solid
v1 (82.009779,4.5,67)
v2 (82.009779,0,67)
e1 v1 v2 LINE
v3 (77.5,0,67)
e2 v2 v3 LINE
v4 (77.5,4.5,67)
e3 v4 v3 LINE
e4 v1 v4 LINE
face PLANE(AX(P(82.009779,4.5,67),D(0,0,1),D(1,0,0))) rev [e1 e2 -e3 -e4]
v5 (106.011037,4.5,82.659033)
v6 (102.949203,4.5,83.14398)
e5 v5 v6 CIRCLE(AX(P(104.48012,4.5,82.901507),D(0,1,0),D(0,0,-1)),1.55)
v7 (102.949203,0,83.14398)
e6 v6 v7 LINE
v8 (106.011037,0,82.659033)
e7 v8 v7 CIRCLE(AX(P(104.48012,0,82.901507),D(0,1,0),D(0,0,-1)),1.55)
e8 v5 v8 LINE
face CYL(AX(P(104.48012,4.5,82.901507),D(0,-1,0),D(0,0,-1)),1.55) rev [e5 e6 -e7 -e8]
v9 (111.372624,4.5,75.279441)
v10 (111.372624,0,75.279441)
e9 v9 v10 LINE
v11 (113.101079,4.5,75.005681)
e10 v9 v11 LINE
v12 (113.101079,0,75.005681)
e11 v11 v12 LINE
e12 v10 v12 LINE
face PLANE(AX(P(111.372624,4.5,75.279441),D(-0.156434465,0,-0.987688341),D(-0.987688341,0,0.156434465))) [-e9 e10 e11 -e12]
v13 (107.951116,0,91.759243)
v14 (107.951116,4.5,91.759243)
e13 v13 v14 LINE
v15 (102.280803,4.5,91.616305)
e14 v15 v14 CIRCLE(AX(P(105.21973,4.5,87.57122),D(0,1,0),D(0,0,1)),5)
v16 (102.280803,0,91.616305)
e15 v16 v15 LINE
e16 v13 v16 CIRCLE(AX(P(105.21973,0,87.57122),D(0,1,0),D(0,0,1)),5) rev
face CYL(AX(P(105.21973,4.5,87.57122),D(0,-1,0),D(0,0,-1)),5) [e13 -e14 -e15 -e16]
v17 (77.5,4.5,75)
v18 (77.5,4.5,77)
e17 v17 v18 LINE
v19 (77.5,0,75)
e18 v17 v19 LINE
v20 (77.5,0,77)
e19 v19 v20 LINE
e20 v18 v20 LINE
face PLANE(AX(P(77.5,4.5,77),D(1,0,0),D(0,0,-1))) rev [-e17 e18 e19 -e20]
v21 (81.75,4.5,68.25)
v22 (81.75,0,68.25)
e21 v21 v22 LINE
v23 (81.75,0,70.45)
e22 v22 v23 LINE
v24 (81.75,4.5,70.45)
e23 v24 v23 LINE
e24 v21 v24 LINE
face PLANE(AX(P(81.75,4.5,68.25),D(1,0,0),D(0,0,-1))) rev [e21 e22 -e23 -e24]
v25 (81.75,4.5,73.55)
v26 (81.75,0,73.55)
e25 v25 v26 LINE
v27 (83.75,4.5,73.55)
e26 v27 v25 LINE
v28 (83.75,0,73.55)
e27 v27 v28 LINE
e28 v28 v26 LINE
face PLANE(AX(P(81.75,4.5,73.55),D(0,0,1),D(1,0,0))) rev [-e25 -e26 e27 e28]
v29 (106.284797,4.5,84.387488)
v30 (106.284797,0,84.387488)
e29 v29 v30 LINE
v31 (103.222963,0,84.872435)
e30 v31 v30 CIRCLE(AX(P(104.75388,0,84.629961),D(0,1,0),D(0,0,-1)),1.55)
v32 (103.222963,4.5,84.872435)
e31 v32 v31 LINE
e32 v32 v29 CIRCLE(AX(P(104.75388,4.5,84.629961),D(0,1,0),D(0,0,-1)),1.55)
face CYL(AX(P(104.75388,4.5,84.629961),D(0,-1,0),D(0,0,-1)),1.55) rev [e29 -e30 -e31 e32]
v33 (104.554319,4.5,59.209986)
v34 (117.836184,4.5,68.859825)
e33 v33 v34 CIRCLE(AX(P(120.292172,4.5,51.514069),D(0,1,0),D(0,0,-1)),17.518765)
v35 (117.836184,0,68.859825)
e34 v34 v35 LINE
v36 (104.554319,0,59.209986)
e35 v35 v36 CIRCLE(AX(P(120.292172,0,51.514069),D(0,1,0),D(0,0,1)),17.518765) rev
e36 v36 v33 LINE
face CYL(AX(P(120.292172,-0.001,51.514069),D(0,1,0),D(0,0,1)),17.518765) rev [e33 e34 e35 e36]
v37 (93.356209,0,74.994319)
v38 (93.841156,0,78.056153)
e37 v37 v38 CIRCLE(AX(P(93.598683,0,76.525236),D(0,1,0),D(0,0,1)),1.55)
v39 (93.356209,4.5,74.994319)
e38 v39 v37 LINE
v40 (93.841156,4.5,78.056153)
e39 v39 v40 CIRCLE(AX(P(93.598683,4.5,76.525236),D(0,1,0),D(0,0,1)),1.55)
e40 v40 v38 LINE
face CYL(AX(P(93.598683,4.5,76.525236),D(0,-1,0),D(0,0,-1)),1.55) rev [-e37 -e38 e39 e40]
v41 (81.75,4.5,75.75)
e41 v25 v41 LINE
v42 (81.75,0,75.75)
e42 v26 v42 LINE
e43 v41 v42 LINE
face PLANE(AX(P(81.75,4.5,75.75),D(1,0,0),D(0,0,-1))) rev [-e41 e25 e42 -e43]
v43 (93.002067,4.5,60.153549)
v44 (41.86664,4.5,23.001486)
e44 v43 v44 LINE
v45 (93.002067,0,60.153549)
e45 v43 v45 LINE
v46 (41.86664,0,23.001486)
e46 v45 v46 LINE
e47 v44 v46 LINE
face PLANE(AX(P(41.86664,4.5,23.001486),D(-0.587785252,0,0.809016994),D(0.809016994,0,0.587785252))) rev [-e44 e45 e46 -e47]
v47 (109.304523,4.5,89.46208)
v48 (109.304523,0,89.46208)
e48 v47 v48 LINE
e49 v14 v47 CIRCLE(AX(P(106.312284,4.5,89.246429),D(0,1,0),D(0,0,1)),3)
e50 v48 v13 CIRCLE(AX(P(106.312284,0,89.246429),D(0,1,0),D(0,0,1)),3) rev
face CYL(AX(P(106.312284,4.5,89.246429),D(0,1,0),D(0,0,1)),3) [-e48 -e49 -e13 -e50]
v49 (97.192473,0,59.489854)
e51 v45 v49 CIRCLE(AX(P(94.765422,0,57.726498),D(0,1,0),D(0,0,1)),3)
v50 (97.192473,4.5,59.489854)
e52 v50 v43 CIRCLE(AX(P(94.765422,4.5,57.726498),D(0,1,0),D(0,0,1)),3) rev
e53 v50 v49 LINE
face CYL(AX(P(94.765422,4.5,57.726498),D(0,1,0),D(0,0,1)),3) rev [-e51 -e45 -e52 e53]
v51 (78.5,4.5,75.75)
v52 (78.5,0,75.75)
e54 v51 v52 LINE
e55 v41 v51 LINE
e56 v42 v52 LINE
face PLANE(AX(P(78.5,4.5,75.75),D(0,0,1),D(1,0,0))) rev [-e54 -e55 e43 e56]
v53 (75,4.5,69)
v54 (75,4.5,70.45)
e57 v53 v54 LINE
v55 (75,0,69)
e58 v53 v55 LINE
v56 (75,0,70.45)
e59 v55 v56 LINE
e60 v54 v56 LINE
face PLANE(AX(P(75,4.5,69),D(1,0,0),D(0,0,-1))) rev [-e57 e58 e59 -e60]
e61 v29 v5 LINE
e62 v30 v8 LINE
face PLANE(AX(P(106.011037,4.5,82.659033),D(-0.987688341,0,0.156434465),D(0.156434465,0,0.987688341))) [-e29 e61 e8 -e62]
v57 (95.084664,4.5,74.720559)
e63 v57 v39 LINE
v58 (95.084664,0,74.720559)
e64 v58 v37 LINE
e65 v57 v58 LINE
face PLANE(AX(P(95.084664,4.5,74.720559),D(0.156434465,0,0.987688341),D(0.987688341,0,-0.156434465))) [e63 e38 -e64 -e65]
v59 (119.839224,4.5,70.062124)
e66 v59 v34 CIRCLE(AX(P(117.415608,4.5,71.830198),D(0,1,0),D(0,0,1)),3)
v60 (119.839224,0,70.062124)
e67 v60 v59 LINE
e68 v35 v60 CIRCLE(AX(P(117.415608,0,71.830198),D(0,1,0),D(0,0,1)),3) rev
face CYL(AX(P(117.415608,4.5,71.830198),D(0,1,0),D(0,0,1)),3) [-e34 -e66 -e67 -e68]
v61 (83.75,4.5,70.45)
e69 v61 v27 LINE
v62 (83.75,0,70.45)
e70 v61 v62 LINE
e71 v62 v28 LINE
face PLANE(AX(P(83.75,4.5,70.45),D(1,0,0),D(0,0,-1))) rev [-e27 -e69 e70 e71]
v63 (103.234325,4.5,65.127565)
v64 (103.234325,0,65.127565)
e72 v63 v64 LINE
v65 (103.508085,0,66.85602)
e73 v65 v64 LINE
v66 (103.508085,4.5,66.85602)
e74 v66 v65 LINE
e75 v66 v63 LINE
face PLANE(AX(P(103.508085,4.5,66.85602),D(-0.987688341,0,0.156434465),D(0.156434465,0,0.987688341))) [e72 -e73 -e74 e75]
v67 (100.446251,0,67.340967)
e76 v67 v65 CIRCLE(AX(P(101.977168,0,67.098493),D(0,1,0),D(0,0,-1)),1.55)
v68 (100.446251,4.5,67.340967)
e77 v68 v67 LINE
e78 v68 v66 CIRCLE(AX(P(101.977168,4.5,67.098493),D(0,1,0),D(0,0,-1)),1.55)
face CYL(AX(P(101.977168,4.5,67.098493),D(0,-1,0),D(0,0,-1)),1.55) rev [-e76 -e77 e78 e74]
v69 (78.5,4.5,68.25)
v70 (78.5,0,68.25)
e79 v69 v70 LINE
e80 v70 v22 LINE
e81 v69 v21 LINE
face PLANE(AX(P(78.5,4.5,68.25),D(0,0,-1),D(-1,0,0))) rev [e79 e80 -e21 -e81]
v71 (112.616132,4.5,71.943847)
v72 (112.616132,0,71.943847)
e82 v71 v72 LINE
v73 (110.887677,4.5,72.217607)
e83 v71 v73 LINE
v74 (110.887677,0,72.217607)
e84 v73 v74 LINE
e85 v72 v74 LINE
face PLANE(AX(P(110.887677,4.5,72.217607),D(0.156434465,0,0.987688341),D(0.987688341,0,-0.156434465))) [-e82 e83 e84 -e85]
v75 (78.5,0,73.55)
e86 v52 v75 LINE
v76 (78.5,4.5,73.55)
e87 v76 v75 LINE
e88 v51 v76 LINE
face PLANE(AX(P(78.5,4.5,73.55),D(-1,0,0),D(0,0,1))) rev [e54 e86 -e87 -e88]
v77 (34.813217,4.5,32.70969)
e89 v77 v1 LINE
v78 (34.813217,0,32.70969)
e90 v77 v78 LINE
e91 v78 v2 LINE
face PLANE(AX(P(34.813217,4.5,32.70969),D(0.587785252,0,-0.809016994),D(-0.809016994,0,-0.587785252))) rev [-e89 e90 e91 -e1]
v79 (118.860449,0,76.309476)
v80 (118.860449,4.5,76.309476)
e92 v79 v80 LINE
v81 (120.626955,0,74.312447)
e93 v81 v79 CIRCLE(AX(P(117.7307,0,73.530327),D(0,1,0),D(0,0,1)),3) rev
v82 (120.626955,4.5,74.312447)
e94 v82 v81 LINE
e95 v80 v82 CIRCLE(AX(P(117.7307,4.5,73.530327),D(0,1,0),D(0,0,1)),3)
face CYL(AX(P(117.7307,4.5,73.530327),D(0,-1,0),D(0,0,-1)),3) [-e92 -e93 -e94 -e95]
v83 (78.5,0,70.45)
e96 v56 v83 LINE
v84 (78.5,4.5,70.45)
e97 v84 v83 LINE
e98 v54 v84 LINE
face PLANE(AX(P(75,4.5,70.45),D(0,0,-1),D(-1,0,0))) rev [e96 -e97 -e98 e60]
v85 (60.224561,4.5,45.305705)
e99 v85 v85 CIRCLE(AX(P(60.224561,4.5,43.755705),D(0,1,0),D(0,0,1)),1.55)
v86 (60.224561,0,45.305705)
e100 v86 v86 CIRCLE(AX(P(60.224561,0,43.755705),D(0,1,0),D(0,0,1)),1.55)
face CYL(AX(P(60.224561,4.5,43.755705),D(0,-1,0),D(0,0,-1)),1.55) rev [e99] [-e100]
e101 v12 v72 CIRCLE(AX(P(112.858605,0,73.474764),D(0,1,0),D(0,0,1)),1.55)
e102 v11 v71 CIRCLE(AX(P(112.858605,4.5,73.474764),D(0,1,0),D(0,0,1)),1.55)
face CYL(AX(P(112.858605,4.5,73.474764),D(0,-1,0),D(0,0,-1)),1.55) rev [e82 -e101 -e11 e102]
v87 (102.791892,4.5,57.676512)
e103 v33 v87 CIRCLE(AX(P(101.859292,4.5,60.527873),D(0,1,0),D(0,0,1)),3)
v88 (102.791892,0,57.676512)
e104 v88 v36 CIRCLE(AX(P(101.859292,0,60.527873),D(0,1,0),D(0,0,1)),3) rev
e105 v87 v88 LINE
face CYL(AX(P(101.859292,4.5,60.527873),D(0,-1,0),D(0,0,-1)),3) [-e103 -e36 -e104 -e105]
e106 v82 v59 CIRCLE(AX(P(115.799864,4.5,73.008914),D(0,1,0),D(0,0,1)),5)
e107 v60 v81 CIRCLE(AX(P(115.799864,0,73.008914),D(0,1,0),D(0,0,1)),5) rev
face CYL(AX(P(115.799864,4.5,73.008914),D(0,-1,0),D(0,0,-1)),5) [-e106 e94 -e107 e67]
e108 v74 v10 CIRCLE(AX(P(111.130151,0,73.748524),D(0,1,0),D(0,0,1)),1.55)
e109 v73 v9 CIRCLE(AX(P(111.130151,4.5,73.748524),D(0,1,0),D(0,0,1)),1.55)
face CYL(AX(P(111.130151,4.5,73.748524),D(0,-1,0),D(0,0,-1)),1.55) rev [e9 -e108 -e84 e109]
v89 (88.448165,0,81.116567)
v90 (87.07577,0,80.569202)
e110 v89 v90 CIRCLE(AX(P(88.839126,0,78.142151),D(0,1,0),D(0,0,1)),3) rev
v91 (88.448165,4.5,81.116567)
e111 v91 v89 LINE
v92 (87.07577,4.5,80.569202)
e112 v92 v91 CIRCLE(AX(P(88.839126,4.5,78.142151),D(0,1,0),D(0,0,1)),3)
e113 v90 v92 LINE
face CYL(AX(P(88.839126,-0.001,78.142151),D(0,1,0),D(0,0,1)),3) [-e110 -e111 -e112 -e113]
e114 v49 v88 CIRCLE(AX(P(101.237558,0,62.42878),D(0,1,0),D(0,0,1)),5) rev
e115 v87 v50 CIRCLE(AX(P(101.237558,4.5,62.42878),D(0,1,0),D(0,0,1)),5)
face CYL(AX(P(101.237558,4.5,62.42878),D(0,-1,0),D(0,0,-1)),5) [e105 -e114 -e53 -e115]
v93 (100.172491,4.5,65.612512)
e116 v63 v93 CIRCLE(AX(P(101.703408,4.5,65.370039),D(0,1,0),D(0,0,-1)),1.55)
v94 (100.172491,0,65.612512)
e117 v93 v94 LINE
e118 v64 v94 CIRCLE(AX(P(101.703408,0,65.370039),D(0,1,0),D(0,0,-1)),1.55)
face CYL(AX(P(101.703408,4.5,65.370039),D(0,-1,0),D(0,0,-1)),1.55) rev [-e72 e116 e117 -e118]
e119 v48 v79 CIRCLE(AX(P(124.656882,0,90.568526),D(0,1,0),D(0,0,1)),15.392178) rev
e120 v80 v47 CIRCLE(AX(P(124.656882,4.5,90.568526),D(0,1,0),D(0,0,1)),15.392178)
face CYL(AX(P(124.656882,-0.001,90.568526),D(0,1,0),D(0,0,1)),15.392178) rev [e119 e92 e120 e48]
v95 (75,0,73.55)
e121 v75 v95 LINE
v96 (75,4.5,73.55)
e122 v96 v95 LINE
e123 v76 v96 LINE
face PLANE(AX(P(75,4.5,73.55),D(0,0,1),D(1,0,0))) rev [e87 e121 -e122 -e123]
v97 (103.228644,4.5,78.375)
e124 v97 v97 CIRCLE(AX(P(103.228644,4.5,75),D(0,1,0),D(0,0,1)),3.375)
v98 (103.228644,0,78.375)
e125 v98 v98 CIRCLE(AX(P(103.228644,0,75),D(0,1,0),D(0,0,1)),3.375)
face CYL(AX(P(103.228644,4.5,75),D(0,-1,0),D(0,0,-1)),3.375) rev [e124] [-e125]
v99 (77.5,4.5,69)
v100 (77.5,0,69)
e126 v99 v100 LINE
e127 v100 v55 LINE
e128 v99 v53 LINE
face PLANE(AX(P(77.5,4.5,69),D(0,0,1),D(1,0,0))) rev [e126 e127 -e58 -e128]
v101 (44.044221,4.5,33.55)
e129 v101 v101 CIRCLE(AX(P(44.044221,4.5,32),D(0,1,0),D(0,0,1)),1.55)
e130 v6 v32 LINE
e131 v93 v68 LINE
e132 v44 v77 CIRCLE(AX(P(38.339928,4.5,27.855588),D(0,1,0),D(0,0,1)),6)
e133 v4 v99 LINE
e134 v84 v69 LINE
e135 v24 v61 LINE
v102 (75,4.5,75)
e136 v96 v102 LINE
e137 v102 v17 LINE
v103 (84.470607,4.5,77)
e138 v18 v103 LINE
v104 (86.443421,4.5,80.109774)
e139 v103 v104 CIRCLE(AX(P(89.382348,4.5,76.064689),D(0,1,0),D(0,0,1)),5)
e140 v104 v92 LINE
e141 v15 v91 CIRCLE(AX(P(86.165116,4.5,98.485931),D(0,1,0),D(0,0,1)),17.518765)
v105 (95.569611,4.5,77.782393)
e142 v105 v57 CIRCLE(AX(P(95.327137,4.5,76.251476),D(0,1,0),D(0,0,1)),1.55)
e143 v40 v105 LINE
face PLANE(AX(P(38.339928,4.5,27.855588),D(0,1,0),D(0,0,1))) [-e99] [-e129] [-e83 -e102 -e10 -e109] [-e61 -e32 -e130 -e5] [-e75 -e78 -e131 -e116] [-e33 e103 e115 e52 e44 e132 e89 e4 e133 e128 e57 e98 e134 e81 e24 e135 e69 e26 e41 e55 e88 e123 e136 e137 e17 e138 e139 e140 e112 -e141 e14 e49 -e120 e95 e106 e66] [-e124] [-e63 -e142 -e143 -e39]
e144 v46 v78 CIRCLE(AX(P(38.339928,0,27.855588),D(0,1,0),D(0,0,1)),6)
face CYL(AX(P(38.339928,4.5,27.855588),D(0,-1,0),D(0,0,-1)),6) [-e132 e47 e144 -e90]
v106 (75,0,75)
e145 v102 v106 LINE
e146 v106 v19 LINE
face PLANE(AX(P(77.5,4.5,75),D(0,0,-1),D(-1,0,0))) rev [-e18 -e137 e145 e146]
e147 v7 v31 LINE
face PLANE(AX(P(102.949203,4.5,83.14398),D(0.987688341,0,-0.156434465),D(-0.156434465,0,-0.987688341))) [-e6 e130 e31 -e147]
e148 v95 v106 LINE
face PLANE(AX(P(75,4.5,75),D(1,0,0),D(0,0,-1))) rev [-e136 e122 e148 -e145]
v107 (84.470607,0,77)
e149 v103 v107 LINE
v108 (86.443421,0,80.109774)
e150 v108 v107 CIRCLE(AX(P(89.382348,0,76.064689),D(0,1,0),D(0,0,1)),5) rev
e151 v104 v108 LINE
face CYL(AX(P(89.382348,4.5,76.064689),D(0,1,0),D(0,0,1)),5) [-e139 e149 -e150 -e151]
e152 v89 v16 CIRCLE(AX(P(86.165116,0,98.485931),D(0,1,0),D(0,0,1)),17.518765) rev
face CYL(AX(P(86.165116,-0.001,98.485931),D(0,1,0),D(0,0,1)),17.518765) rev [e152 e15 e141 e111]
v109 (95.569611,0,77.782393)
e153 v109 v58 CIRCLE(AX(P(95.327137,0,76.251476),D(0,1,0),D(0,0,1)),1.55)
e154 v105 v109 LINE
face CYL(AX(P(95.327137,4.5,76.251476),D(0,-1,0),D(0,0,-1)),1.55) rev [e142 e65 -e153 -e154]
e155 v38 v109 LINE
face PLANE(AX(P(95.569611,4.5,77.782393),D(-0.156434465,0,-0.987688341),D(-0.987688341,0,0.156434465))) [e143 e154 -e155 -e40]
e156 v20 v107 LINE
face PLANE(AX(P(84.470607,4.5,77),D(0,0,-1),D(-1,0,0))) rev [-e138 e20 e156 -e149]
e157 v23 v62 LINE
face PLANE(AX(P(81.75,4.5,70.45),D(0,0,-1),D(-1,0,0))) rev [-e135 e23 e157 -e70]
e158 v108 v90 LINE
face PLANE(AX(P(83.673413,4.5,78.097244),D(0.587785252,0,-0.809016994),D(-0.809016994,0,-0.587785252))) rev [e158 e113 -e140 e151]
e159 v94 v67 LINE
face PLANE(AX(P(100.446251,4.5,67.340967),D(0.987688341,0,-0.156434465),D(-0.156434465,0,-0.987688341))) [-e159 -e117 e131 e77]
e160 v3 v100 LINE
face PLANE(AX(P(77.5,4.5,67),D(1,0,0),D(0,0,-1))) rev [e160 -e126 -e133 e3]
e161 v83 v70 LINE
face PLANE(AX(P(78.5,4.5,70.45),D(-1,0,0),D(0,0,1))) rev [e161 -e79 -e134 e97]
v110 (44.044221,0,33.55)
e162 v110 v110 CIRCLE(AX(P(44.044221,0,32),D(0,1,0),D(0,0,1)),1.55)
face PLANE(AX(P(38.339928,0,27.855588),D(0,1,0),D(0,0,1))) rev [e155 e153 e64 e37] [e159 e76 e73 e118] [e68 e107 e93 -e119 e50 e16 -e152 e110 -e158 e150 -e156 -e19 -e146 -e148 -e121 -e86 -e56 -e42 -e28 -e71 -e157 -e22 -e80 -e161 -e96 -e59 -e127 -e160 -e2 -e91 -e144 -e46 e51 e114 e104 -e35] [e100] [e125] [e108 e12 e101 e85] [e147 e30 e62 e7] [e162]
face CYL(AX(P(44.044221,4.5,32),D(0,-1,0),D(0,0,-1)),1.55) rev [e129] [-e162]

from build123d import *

# Parameters (mm, degrees)
SKETCH_3_R          = 3.375
SKETCH_3_R_2        = 1.55
EXTRUDE_1_DEPTH     = 4.5
FILLET_1_R          = 5
CUT_EXTRUDE_2_REACH = 154.257
FILLET_3_R          = 3


# Some blends are built 0.0001 mm under size
with BuildPart() as part:
    # 草图3 → 凸台-拉伸1 (new body)
    with BuildSketch(Plane(origin=(0, 0, 0), x_dir=(1, 0, 0), z_dir=(0, 1, 0))):
        with BuildLine():
            Line((41.866639538, -23.001486264), (95.429117628, -61.916904502))
            Line((95.429117628, -61.916904502), (100.131399646, -55.444768547))
            Line((100.131399646, -55.444768547), (122.783875489, -71.902755611))
            Line((122.783875489, -71.902755611), (106.325888424, -94.555231453))
            Line((106.325888424, -94.555231453), (83.673412582, -78.097244389))
            Line((83.673412582, -78.097244389), (84.470607294, -77))
            Line((84.470607294, -77), (82.009778971, -77))
            Line((82.009778971, -77), (77.5, -77))
            Line((77.5, -77), (77.5, -75))
            Line((77.5, -75), (75, -75))
            Line((75, -75), (75, -73.55))
            Line((75, -73.55), (78.5, -73.55))
            Line((78.5, -73.55), (78.5, -75.75))
            Line((78.5, -75.75), (81.75, -75.75))
            Line((81.75, -75.75), (81.75, -73.55))
            Line((81.75, -73.55), (83.75, -73.55))
            Line((83.75, -73.55), (83.75, -70.45))
            Line((83.75, -70.45), (81.75, -70.45))
            Line((81.75, -70.45), (81.75, -68.25))
            Line((81.75, -68.25), (78.5, -68.25))
            Line((78.5, -68.25), (78.5, -70.45))
            Line((78.5, -70.45), (75, -70.45))
            Line((75, -70.45), (75, -69))
            Line((75, -69), (77.5, -69))
            Line((77.5, -69), (77.5, -67))
            Line((77.5, -67), (82.009778971, -67))
            Line((82.009778971, -67), (34.81321651, -32.709690196))
            ThreePointArc((34.81321651, -32.709690196), (33.485826058, -24.328876716), (41.866639538, -23.001486264))
        make_face()
        with Locations(Location((103.228644035, -75, 0), (0, 0, 270))):
            Circle(SKETCH_3_R, mode=Mode.SUBTRACT)
        with Locations(Location((44.044221455, -32, 0), (0, 0, 270))):
            Circle(SKETCH_3_R_2, mode=Mode.SUBTRACT)
        with Locations(Location((60.224561343, -43.755705046, 0), (0, 0, 270))):
            Circle(SKETCH_3_R_2, mode=Mode.SUBTRACT)
        with BuildLine():
            Line((110.887677339, -72.217607352), (112.616131935, -71.943847038))
            ThreePointArc((112.616131935, -71.943847038), (114.389522284, -73.232290545), (113.101078777, -75.005680894))
            Line((113.101078777, -75.005680894), (111.372624181, -75.279441208))
            ThreePointArc((111.372624181, -75.279441208), (109.599233832, -73.9909977), (110.887677339, -72.217607352))
        make_face(mode=Mode.SUBTRACT)
        with BuildLine():
            Line((103.508085243, -66.856019854), (103.234324929, -65.127565258))
            ThreePointArc((103.234324929, -65.127565258), (101.46093458, -63.839121751), (100.172491073, -65.6125121))
            Line((100.172491073, -65.6125121), (100.446251387, -67.340966696))
            ThreePointArc((100.446251387, -67.340966696), (102.219641736, -68.629410203), (103.508085243, -66.856019854))
        make_face(mode=Mode.SUBTRACT)
        with BuildLine():
            Line((95.569610731, -77.782392648), (93.841156135, -78.056152962))
            ThreePointArc((93.841156135, -78.056152962), (92.067765787, -76.767709455), (93.356209294, -74.994319106))
            Line((93.356209294, -74.994319106), (95.08466389, -74.720558792))
            ThreePointArc((95.08466389, -74.720558792), (96.858054238, -76.0090023), (95.569610731, -77.782392648))
        make_face(mode=Mode.SUBTRACT)
        with BuildLine():
            Line((102.949202828, -83.143980146), (103.222963142, -84.872434742))
            ThreePointArc((103.222963142, -84.872434742), (104.99635349, -86.160878249), (106.284796997, -84.3874879))
            Line((106.284796997, -84.3874879), (106.011036684, -82.659033304))
            ThreePointArc((106.011036684, -82.659033304), (104.237646335, -81.370589797), (102.949202828, -83.143980146))
        make_face(mode=Mode.SUBTRACT)
    extrude(amount=EXTRUDE_1_DEPTH)

    # 圆角-美观1
    # the kernel refuses this fillet: 5 mm, written as the material it takes off along each edge
    with BuildSketch(Plane(origin=(83.673412582, -8.559797701, 78.097244389), x_dir=(0.5877852522924398, 0, -0.8090169943749717), z_dir=(0, 1, 0))) as fillet_1_piece_1:
        with BuildLine():
            CenterArc((5, -3.423919081), FILLET_1_R, 136.781392116, 43.218607884)
            Line((0, -3.423919081), (-0.1, -3.423919081))
            Line((-0.1, -3.423919081), (-0.1, 0))
            Line((-0.1, 0), (0, 0.1))
            ThreePointArc((0, 0.1), (0.678134326, 0.1), (1.283394026, 0.068478382))
            Line((1.283394026, 0.068478382), (1.356268653, 0))
        make_face()
    extrude(amount=21.619595403, mode=Mode.SUBTRACT)
    with BuildSketch(Plane(origin=(100.131399646, -12.5, 55.444768547), x_dir=(0.8090169943749468, 0, 0.5877852522924739), z_dir=(0, 1, 0)), Plane(origin=(122.783875489, -12.5, 71.902755611), x_dir=(-0.5877852522924745, 0, 0.8090169943749465), z_dir=(0, 1, 0)), Plane(origin=(106.325888424, -12.5, 94.555231453), x_dir=(-0.8090169943749468, 0, -0.5877852522924739), z_dir=(0, 1, 0))) as fillet_1_piece_2:
        with BuildLine():
            CenterArc((FILLET_1_R, -FILLET_1_R), FILLET_1_R, 90, 90)
            Line((0, -FILLET_1_R), (-FILLET_1_R * 0.02, -FILLET_1_R))
            Line((-FILLET_1_R * 0.02, -FILLET_1_R), (-FILLET_1_R * 0.02, FILLET_1_R * 0.02))
            Line((-FILLET_1_R * 0.02, FILLET_1_R * 0.02), (FILLET_1_R, FILLET_1_R * 0.02))
            Line((FILLET_1_R, FILLET_1_R * 0.02), (FILLET_1_R, 0))
        make_face()
    extrude(amount=29.5, mode=Mode.SUBTRACT)

    # 草图4 → 圆弧-美观2 (cut, up to next)
    with BuildSketch(Plane(origin=(0, 4.5, 0), x_dir=(1, 0, 0), z_dir=(0, 1, 0)), mode=Mode.PRIVATE) as cut_extrude_2_sk1:
        with BuildLine():
            Line((104.176484618, -58.383694808), (118.738790517, -68.963829349))
            ThreePointArc((118.738790517, -68.963829349), (109.994899962, -65.687047674), (104.176484618, -58.383694808))
        make_face()
    cut_extrude_2_tool1 = extrude(cut_extrude_2_sk1.sketch, amount=-CUT_EXTRUDE_2_REACH, mode=Mode.PRIVATE) & part.part
    # 草图4 → 圆弧-美观2 (cut, up to next)
    with BuildSketch(Plane(origin=(0, 4.5, 0), x_dir=(1, 0, 0), z_dir=(0, 1, 0)), mode=Mode.PRIVATE) as cut_extrude_2_sk2:
        with BuildLine():
            Line((119.844949227, -75.947840583), (109.264814686, -90.510146481))
            ThreePointArc((109.264814686, -90.510146481), (112.204348353, -81.521230905), (119.844949227, -75.947840583))
        make_face()
    cut_extrude_2_tool2 = extrude(cut_extrude_2_sk2.sketch, amount=-CUT_EXTRUDE_2_REACH, mode=Mode.PRIVATE) & part.part
    # 草图4 → 圆弧-美观2 (cut, up to next)
    with BuildSketch(Plane(origin=(0, 4.5, 0), x_dir=(1, 0, 0), z_dir=(0, 1, 0)), mode=Mode.PRIVATE) as cut_extrude_2_sk3:
        with BuildLine():
            Line((87.718497554, -81.036170651), (102.280803453, -91.616305192))
            ThreePointArc((102.280803453, -91.616305192), (96.462388109, -84.312952326), (87.718497554, -81.036170651))
        make_face()
    cut_extrude_2_tool3 = extrude(cut_extrude_2_sk3.sketch, amount=-CUT_EXTRUDE_2_REACH, mode=Mode.PRIVATE) & part.part
    add(cut_extrude_2_tool1.solids().sort_by_distance((110.868828, 4.5, 64.48419))[0], mode=Mode.SUBTRACT)
    add(cut_extrude_2_tool2.solids().sort_by_distance((113.606622, 4.5, 82.540042))[0], mode=Mode.SUBTRACT)
    add(cut_extrude_2_tool3.solids().sort_by_distance((95.58846, 4.5, 85.51581))[0], mode=Mode.SUBTRACT)

    # 圆角-美观3
    fillet_3_edges = [part.edges().sort_by_distance(p)[0] for p in [
        (104.176484618, 2.25, 58.383694808),
        (118.738790517, 2.25, 68.963829349),
        (119.844949227, 2.25, 75.947840583),
        (109.264814686, 2.25, 90.510146481),
        (95.429117628, 2.25, 61.916904502),
        (87.718497554, 2.25, 81.036170651),
    ]]
    fillet(fillet_3_edges, radius=FILLET_3_R - 0.0001)  # a hair under: the kernel refuses the full size


solid = part.part
